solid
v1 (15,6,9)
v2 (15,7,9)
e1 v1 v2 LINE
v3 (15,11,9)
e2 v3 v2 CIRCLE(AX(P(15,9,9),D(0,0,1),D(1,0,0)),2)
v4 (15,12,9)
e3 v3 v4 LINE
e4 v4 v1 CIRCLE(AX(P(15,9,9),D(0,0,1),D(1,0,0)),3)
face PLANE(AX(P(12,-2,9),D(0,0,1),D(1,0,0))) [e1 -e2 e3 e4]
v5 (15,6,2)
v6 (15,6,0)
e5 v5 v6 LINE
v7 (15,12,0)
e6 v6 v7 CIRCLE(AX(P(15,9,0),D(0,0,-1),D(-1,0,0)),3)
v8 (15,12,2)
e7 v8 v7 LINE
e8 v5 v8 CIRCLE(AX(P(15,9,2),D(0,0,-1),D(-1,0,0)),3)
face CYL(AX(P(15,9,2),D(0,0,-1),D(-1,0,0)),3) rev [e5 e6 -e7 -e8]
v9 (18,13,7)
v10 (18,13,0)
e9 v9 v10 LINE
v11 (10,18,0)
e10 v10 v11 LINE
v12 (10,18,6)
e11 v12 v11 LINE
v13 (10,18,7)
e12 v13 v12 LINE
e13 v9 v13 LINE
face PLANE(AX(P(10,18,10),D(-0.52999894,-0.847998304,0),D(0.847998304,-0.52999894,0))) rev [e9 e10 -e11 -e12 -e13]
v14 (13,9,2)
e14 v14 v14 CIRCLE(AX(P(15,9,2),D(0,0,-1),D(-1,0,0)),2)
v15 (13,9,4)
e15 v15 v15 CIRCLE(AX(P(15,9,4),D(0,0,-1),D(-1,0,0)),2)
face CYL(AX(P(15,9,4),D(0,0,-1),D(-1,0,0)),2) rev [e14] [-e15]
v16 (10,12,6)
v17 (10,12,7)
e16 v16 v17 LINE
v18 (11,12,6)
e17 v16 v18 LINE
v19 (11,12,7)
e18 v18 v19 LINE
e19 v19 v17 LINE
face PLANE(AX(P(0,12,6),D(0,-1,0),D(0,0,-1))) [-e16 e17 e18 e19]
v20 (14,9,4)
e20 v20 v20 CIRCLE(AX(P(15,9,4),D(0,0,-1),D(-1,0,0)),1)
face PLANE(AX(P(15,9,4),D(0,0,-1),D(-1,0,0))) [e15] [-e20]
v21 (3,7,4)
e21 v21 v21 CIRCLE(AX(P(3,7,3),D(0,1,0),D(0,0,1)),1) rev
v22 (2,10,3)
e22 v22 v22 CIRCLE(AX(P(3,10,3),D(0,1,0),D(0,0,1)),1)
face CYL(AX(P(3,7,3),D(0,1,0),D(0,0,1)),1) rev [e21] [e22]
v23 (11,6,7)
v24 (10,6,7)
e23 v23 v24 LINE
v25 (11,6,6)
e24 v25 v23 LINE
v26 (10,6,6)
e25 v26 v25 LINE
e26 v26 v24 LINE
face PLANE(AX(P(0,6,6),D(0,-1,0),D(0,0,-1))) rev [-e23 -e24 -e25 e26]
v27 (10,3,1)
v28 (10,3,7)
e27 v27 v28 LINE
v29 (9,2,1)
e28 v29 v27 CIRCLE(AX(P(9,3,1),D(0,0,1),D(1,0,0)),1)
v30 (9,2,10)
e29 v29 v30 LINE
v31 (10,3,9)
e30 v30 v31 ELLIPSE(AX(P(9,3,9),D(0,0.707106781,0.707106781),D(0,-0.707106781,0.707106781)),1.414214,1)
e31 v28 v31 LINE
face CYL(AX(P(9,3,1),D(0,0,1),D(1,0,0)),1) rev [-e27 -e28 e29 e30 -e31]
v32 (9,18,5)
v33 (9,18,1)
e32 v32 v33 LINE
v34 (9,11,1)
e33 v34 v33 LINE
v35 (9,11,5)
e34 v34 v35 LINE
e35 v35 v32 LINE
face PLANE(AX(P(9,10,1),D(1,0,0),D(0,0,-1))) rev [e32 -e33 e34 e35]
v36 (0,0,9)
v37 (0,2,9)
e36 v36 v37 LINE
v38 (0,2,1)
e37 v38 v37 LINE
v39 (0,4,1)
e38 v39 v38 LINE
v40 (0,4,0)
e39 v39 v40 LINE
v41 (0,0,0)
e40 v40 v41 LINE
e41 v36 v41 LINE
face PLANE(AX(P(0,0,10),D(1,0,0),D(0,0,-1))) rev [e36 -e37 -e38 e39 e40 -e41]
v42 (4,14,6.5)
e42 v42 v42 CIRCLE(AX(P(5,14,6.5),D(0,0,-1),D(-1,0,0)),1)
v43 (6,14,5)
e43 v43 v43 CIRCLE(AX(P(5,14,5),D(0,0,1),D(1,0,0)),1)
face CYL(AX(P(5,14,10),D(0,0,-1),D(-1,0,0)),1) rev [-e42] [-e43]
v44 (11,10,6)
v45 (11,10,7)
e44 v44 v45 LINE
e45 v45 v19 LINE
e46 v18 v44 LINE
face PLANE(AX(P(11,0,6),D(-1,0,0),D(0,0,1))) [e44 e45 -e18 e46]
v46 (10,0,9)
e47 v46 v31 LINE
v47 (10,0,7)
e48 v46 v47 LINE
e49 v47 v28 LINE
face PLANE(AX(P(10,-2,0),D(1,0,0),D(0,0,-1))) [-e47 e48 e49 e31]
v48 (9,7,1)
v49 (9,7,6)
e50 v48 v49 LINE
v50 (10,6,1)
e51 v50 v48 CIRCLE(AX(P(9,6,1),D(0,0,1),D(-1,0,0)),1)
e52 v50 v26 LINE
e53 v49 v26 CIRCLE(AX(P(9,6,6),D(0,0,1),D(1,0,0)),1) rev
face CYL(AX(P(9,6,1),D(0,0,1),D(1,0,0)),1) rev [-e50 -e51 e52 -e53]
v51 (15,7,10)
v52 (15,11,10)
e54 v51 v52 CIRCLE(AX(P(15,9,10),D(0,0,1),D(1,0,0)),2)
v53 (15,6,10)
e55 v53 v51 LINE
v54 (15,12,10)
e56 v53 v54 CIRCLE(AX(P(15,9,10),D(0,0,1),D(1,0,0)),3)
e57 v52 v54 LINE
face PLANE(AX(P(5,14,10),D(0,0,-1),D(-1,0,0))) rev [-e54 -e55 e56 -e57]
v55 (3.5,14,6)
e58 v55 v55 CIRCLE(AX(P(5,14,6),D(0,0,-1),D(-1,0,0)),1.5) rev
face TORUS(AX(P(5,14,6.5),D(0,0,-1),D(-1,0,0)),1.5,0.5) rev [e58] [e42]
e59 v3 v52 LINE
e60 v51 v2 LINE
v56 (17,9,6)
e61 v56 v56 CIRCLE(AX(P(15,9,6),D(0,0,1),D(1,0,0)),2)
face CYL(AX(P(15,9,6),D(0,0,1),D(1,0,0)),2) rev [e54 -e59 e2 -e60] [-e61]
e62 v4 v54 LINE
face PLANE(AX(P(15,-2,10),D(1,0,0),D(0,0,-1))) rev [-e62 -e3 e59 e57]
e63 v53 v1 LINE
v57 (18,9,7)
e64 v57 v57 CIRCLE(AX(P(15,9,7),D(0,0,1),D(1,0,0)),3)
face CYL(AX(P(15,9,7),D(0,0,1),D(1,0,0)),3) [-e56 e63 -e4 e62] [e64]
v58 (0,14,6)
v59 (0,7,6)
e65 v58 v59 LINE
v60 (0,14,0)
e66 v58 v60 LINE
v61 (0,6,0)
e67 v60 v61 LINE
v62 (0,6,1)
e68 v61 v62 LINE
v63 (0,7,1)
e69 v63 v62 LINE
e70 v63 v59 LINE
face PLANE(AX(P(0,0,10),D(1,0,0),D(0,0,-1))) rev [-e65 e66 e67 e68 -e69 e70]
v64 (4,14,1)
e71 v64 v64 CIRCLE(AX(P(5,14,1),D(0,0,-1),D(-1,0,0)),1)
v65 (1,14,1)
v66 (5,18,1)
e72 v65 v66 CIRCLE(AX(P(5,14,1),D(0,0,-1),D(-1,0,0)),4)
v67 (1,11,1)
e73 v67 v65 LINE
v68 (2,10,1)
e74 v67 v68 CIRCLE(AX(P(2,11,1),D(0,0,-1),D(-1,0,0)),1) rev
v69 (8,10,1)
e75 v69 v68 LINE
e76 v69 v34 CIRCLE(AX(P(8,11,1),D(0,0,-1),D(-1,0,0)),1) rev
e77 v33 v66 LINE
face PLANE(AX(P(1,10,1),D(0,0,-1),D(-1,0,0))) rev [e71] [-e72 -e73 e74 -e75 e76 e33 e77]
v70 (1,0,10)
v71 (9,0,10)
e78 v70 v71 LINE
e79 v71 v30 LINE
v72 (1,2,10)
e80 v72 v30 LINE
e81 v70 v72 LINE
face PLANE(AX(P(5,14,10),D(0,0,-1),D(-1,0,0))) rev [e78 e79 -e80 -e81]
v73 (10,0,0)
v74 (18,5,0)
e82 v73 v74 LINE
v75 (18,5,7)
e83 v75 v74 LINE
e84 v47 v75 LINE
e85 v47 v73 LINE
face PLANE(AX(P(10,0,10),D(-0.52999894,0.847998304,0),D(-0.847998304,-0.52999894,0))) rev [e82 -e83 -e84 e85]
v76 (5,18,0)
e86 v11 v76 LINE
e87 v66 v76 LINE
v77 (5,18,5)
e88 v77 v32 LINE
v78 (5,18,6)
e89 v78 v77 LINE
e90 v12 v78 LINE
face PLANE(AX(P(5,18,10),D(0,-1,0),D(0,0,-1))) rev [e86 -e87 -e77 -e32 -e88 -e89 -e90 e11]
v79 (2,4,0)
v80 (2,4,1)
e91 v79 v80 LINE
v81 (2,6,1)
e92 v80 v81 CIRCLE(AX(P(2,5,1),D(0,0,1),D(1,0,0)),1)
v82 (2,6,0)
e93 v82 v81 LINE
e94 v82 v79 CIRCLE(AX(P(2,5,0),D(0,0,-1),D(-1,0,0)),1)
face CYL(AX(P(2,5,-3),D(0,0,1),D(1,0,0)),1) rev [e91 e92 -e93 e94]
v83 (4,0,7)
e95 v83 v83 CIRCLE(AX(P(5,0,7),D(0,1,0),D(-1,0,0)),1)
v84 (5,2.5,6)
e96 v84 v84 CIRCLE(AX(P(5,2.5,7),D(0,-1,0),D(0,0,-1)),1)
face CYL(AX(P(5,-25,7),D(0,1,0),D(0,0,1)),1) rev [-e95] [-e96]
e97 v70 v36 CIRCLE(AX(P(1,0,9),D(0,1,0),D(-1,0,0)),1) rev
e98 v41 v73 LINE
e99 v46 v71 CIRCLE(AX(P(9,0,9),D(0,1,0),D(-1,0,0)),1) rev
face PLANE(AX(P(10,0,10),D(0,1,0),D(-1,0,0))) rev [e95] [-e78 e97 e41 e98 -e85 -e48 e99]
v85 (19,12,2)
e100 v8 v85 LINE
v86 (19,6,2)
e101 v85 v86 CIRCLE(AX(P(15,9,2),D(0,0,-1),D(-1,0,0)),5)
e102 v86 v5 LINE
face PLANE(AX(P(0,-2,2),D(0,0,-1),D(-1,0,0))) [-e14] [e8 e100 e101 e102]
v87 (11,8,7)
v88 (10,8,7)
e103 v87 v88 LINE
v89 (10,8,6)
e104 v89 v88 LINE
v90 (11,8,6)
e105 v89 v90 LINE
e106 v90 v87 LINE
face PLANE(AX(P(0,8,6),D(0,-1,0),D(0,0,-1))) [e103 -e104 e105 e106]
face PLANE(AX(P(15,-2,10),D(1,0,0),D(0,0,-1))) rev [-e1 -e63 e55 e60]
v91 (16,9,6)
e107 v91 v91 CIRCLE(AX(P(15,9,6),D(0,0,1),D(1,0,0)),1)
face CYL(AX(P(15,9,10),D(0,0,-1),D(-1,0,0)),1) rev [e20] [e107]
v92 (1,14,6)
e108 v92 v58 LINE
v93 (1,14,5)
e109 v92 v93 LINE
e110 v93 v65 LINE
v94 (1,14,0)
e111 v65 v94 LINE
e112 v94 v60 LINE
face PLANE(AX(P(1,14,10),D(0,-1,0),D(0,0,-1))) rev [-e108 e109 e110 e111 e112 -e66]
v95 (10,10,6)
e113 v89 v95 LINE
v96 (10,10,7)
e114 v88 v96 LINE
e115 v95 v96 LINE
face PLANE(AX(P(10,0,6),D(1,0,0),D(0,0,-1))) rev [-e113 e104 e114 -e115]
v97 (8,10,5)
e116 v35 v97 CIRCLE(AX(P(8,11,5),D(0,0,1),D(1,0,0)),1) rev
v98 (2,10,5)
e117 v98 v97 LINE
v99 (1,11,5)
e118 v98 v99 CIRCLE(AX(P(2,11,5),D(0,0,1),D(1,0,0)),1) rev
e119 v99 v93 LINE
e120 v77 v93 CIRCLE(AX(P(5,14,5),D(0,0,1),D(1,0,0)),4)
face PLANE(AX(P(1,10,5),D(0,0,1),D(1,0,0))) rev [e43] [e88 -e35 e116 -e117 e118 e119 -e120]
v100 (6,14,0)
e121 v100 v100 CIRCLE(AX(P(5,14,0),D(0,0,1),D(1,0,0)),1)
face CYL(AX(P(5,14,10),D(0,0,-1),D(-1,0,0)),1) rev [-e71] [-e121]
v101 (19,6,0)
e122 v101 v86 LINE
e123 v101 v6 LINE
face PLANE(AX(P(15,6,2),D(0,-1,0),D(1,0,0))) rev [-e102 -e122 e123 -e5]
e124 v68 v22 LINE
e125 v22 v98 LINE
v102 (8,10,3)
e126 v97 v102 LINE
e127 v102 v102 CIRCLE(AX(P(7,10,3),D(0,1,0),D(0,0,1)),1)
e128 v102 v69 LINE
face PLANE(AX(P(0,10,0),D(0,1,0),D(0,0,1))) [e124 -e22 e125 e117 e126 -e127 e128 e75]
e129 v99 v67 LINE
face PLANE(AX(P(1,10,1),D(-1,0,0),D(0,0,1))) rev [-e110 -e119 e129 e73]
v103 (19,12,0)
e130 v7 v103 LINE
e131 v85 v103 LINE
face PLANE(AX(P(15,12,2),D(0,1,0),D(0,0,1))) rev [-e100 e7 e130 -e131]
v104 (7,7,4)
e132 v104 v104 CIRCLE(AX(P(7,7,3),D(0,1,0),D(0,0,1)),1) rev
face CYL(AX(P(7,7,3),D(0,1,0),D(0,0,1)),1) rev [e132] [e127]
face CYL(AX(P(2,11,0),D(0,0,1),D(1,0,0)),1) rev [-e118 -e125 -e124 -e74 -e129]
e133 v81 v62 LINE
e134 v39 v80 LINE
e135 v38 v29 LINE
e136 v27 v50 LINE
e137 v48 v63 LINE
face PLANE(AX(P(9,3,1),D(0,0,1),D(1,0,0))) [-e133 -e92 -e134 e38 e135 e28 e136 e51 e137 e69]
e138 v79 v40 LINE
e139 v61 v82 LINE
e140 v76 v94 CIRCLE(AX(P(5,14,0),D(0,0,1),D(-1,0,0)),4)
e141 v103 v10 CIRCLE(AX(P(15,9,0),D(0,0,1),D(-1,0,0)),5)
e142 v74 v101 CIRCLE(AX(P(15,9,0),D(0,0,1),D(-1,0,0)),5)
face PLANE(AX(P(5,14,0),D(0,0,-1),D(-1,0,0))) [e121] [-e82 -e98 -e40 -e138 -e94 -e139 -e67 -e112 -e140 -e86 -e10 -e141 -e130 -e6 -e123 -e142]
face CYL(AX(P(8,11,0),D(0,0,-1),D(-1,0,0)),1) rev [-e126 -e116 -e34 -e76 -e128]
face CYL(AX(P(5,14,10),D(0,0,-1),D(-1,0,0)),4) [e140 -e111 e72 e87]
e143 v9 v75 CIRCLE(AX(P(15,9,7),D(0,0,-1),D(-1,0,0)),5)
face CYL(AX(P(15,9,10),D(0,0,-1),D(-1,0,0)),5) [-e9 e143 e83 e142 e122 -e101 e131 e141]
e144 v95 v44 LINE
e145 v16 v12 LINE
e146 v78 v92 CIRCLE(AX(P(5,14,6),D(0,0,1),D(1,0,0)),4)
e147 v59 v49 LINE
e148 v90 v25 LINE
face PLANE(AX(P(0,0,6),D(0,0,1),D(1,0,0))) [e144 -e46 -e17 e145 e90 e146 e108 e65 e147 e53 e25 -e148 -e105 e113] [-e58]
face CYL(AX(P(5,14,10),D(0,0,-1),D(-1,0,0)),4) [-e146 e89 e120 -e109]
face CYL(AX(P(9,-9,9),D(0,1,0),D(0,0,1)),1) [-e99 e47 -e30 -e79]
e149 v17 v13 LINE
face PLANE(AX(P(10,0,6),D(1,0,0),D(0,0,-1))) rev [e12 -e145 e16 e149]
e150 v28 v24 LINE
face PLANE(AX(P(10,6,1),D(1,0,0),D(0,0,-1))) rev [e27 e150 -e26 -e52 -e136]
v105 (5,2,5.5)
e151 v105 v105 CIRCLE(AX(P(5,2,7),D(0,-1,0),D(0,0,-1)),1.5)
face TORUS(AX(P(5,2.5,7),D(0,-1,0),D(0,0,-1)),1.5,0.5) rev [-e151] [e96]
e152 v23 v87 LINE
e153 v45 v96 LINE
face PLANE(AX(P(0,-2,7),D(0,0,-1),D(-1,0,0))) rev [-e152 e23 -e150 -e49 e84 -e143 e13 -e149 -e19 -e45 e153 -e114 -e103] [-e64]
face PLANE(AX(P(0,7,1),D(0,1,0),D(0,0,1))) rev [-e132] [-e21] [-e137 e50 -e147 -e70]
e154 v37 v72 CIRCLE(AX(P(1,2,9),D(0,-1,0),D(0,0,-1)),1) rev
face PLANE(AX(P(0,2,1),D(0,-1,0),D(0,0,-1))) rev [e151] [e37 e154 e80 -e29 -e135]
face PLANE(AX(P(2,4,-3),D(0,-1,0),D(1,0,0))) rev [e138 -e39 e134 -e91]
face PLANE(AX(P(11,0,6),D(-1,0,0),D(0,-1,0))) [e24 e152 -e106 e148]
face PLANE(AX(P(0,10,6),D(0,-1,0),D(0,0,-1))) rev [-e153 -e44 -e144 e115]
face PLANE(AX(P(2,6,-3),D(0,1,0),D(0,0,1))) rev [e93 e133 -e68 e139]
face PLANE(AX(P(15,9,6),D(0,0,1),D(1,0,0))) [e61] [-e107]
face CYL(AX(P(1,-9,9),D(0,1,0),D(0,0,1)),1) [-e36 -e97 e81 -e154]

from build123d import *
from build123d.topology import SkipClean

# Parameters (mm, degrees)
SKETCH1_R           = 1
BOSS_EXTRUDE1_DEPTH = 10
SKETCH2_W           = 1
SKETCH2_H           = 2
SKETCH2_W_2         = 2
SKETCH2_H_2         = 3
CUT_EXTRUDE1_DEPTH  = 20
SKETCH3_W           = 11.356791525
SKETCH3_H           = 18.189557321
SKETCH3_R           = 3
CUT_EXTRUDE2_DEPTH  = 3
SKETCH4_R           = 2
CUT_EXTRUDE3_DEPTH  = 4
CUT_EXTRUDE4_START  = -2
CUT_EXTRUDE4_DEPTH  = 2
CUT_EXTRUDE5_START  = -2
SKETCH6_R           = 2
CUT_EXTRUDE5_DEPTH  = 2
SKETCH7_W           = 8
SKETCH7_H           = 4
CUT_EXTRUDE6_DEPTH  = 8
FILLET1_R           = 1
SKETCH9_R           = 1
CUT_EXTRUDE8_DEPTH  = 3
CUT_EXTRUDE9_DEPTH  = 9
CUT_EXTRUDE10_START = -4
SKETCH11_R          = 1
CUT_EXTRUDE10_DEPTH = 4
CUT_EXTRUDE11_DEPTH = 4
CUT_EXTRUDE12_DEPTH = 27
SKETCH14_R          = 1
CUT_EXTRUDE13_DEPTH = 27


with BuildPart() as part:
    # Sketch1 → Boss-Extrude1 (new body)
    with BuildSketch(Plane.XY):
        with BuildLine():
            Line((0, 0), (0, 14))
            Line((0, 14), (1, 14))
            ThreePointArc((1, 14), (2.171572875, 16.828427125), (5, 18))
            Line((5, 18), (10, 18))
            Line((10, 18), (18, 13))
            ThreePointArc((18, 13), (20, 9), (18, 5))
            Line((18, 5), (10, 0))
            Line((10, 0), (0, 0))
        make_face()
        with Locations((5, 14)):
            Circle(SKETCH1_R, mode=Mode.SUBTRACT)
        with Locations((15, 9)):
            Circle(SKETCH1_R, mode=Mode.SUBTRACT)
    extrude(amount=BOSS_EXTRUDE1_DEPTH)

    # Sketch2 → Cut-Extrude1 (cut)
    with BuildSketch(Plane(origin=(0, 18, 0), x_dir=(1, 0, 0), z_dir=(0, 1, 0))):
        with Locations((19.5, -1)):
            Rectangle(SKETCH2_W, SKETCH2_H)
        with Locations((19, -8.5)):
            Rectangle(SKETCH2_W_2, SKETCH2_H_2)
        Polygon((10, -7), (10, -10), (15, -10), (15, -9), (12, -9), (12, -7), align=None)
    extrude(amount=-CUT_EXTRUDE1_DEPTH, mode=Mode.SUBTRACT)

    # Sketch3 → Cut-Extrude2 (cut)
    with BuildSketch(Plane.XY.offset(10)):
        with Locations((15.678395763, 9.094778661)):
            Rectangle(SKETCH3_W, SKETCH3_H)
        with Locations((15, 9)):
            Circle(SKETCH3_R, mode=Mode.SUBTRACT)
    extrude(amount=-CUT_EXTRUDE2_DEPTH, mode=Mode.SUBTRACT)

    # Sketch4 → Cut-Extrude3 (cut)
    with BuildSketch(Plane.XY.offset(10)):
        with Locations((15, 9)):
            Circle(SKETCH4_R)
    extrude(amount=-CUT_EXTRUDE3_DEPTH, mode=Mode.SUBTRACT)

    # Sketch5 → Cut-Extrude4 (cut)
    with BuildSketch(Plane(origin=(0, 0, 0), x_dir=(-1, 0, 0), z_dir=(0, 0, -1)).offset(CUT_EXTRUDE4_START)):
        with BuildLine():
            Line((-15, 6), (-23.076049943, 6))
            ThreePointArc((-23.076049943, 6), (-26.076049943, 9), (-23.076049943, 12))
            Line((-23.076049943, 12), (-15, 12))
            ThreePointArc((-15, 12), (-12, 9), (-15, 6))
        make_face()
    extrude(amount=CUT_EXTRUDE4_DEPTH, mode=Mode.SUBTRACT)

    # Sketch6 → Cut-Extrude5 (cut)
    with BuildSketch(Plane(origin=(0, 0, 2), x_dir=(-1, 0, 0), z_dir=(0, 0, -1)).offset(CUT_EXTRUDE5_START)):
        with Locations((-15, 9)):
            Circle(SKETCH6_R)
    extrude(amount=CUT_EXTRUDE5_DEPTH, mode=Mode.SUBTRACT)

    # Sketch7 → Cut-Extrude6 (cut)
    with BuildSketch(Plane(origin=(0, 18, 0), x_dir=(1, 0, 0), z_dir=(0, 1, 0))):
        with Locations((5, -3)):
            Rectangle(SKETCH7_W, SKETCH7_H)
    extrude(amount=-CUT_EXTRUDE6_DEPTH, mode=Mode.SUBTRACT)

    # Fillet1
    fillet1_edges = [part.edges().sort_by_distance(p)[0] for p in [
        (1, 10, 3),
        (9, 10, 3),
    ]]
    fillet(fillet1_edges, radius=FILLET1_R)

    # Sketch9 → Cut-Extrude8 (cut)
    with BuildSketch(Plane(origin=(0, 10, 0), x_dir=(1, 0, 0), z_dir=(0, 1, 0))):
        with Locations((7, -3)):
            Circle(SKETCH9_R)
        with Locations((3, -3)):
            Circle(SKETCH9_R)
    extrude(amount=-CUT_EXTRUDE8_DEPTH, mode=Mode.SUBTRACT)

    # Sketch10 → Cut-Extrude9 (cut)
    with BuildSketch(Plane.XY.offset(10)):
        with BuildLine():
            Line((0, 7), (9, 7))
            ThreePointArc((9, 7), (9.707106781, 6.707106781), (10, 6))
            Line((10, 6), (10, 3))
            ThreePointArc((10, 3), (9.707106781, 2.292893219), (9, 2))
            Line((9, 2), (0, 2))
            Line((0, 2), (0, 7))
        make_face()
    extrude(amount=-CUT_EXTRUDE9_DEPTH, mode=Mode.SUBTRACT)

    # Sketch11 → Cut-Extrude10 (cut)
    with BuildSketch(Plane.XY.offset(10).offset(CUT_EXTRUDE10_START)):
        with BuildLine():
            Line((10, 8), (10, 10))
            Line((10, 10), (11, 10))
            Line((11, 10), (11, 12))
            Line((11, 12), (10, 12))
            Line((10, 12), (10, 18))
            Line((10, 18), (5, 18))
            ThreePointArc((5, 18), (2.171572875, 16.828427125), (1, 14))
            Line((1, 14), (0, 14))
            Line((0, 14), (0, 7))
            Line((0, 7), (9, 7))
            ThreePointArc((9, 7), (9.707106781, 6.707106781), (10, 6))
            Line((10, 6), (11, 6))
            Line((11, 6), (11, 8))
            Line((11, 8), (10, 8))
        make_face()
        with Locations((5, 14)):
            Circle(SKETCH11_R, mode=Mode.SUBTRACT)
    extrude(amount=CUT_EXTRUDE10_DEPTH, mode=Mode.SUBTRACT)

    # Sketch12 → Cut-Extrude11 (cut)
    with BuildSketch(Plane.XY.offset(1)):
        with BuildLine():
            Line((2, 4), (-2.189178963, 4))
            ThreePointArc((-2.189178963, 4), (-3.189178963, 5), (-2.189178963, 6))
            Line((-2.189178963, 6), (2, 6))
            ThreePointArc((2, 6), (3, 5), (2, 4))
        make_face()
    extrude(amount=-CUT_EXTRUDE11_DEPTH, mode=Mode.SUBTRACT)

    # Sketch13 → Cut-Extrude12 (cut)
    with BuildSketch(Plane(origin=(0, 18, 0), x_dir=(1, 0, 0), z_dir=(0, 1, 0))):
        with BuildLine():
            Line((10, -9), (10, -10))
            Line((10, -10), (9, -10))
            ThreePointArc((9, -10), (9.707106781, -9.707106781), (10, -9))
        make_face()
        with BuildLine():
            Line((1, -10), (0, -10))
            Line((0, -10), (0, -9))
            ThreePointArc((0, -9), (0.292893219, -9.707106781), (1, -10))
        make_face()
    extrude(amount=-CUT_EXTRUDE12_DEPTH, mode=Mode.SUBTRACT)

    # Sketch14 → Cut-Extrude13 (cut)
    with BuildSketch(Plane(origin=(0, 2, 0), x_dir=(1, 0, 0), z_dir=(0, 1, 0))):
        with Locations((5, -7)):
            Circle(SKETCH14_R)
    extrude(amount=-CUT_EXTRUDE13_DEPTH, mode=Mode.SUBTRACT)

    # Sketch15 → Revolve1 (revolve)
    with SkipClean():  # the faces are left unmerged after this step: merging them gives an invalid solid
        with BuildSketch(Plane.XY.offset(7)):
            with BuildLine():
                Line((4, 2), (4, 2.5))
                ThreePointArc((4, 2.5), (3.853553391, 2.146446609), (3.5, 2))
                Line((3.5, 2), (4, 2))
            make_face()
        revolve(axis=Axis((5, 0, 7), (0, 1, 0)))

    # Sketch16 → Revolve2 (revolve)
    with SkipClean():  # the faces are left unmerged after this step: merging them gives an invalid solid
        with BuildSketch(Plane(origin=(0, 14, 0), x_dir=(1, 0, 0), z_dir=(0, 1, 0))):
            with BuildLine():
                Line((4, -6), (4, -6.5))
                ThreePointArc((4, -6.5), (3.853553391, -6.146446609), (3.5, -6))
                Line((3.5, -6), (4, -6))
            make_face()
        revolve(axis=Axis((5, 14, 5), (0, 0, 1)))
    add(part.part.scale(1), mode=Mode.REPLACE)  # the faces are merged on a copy


solid = part.part
